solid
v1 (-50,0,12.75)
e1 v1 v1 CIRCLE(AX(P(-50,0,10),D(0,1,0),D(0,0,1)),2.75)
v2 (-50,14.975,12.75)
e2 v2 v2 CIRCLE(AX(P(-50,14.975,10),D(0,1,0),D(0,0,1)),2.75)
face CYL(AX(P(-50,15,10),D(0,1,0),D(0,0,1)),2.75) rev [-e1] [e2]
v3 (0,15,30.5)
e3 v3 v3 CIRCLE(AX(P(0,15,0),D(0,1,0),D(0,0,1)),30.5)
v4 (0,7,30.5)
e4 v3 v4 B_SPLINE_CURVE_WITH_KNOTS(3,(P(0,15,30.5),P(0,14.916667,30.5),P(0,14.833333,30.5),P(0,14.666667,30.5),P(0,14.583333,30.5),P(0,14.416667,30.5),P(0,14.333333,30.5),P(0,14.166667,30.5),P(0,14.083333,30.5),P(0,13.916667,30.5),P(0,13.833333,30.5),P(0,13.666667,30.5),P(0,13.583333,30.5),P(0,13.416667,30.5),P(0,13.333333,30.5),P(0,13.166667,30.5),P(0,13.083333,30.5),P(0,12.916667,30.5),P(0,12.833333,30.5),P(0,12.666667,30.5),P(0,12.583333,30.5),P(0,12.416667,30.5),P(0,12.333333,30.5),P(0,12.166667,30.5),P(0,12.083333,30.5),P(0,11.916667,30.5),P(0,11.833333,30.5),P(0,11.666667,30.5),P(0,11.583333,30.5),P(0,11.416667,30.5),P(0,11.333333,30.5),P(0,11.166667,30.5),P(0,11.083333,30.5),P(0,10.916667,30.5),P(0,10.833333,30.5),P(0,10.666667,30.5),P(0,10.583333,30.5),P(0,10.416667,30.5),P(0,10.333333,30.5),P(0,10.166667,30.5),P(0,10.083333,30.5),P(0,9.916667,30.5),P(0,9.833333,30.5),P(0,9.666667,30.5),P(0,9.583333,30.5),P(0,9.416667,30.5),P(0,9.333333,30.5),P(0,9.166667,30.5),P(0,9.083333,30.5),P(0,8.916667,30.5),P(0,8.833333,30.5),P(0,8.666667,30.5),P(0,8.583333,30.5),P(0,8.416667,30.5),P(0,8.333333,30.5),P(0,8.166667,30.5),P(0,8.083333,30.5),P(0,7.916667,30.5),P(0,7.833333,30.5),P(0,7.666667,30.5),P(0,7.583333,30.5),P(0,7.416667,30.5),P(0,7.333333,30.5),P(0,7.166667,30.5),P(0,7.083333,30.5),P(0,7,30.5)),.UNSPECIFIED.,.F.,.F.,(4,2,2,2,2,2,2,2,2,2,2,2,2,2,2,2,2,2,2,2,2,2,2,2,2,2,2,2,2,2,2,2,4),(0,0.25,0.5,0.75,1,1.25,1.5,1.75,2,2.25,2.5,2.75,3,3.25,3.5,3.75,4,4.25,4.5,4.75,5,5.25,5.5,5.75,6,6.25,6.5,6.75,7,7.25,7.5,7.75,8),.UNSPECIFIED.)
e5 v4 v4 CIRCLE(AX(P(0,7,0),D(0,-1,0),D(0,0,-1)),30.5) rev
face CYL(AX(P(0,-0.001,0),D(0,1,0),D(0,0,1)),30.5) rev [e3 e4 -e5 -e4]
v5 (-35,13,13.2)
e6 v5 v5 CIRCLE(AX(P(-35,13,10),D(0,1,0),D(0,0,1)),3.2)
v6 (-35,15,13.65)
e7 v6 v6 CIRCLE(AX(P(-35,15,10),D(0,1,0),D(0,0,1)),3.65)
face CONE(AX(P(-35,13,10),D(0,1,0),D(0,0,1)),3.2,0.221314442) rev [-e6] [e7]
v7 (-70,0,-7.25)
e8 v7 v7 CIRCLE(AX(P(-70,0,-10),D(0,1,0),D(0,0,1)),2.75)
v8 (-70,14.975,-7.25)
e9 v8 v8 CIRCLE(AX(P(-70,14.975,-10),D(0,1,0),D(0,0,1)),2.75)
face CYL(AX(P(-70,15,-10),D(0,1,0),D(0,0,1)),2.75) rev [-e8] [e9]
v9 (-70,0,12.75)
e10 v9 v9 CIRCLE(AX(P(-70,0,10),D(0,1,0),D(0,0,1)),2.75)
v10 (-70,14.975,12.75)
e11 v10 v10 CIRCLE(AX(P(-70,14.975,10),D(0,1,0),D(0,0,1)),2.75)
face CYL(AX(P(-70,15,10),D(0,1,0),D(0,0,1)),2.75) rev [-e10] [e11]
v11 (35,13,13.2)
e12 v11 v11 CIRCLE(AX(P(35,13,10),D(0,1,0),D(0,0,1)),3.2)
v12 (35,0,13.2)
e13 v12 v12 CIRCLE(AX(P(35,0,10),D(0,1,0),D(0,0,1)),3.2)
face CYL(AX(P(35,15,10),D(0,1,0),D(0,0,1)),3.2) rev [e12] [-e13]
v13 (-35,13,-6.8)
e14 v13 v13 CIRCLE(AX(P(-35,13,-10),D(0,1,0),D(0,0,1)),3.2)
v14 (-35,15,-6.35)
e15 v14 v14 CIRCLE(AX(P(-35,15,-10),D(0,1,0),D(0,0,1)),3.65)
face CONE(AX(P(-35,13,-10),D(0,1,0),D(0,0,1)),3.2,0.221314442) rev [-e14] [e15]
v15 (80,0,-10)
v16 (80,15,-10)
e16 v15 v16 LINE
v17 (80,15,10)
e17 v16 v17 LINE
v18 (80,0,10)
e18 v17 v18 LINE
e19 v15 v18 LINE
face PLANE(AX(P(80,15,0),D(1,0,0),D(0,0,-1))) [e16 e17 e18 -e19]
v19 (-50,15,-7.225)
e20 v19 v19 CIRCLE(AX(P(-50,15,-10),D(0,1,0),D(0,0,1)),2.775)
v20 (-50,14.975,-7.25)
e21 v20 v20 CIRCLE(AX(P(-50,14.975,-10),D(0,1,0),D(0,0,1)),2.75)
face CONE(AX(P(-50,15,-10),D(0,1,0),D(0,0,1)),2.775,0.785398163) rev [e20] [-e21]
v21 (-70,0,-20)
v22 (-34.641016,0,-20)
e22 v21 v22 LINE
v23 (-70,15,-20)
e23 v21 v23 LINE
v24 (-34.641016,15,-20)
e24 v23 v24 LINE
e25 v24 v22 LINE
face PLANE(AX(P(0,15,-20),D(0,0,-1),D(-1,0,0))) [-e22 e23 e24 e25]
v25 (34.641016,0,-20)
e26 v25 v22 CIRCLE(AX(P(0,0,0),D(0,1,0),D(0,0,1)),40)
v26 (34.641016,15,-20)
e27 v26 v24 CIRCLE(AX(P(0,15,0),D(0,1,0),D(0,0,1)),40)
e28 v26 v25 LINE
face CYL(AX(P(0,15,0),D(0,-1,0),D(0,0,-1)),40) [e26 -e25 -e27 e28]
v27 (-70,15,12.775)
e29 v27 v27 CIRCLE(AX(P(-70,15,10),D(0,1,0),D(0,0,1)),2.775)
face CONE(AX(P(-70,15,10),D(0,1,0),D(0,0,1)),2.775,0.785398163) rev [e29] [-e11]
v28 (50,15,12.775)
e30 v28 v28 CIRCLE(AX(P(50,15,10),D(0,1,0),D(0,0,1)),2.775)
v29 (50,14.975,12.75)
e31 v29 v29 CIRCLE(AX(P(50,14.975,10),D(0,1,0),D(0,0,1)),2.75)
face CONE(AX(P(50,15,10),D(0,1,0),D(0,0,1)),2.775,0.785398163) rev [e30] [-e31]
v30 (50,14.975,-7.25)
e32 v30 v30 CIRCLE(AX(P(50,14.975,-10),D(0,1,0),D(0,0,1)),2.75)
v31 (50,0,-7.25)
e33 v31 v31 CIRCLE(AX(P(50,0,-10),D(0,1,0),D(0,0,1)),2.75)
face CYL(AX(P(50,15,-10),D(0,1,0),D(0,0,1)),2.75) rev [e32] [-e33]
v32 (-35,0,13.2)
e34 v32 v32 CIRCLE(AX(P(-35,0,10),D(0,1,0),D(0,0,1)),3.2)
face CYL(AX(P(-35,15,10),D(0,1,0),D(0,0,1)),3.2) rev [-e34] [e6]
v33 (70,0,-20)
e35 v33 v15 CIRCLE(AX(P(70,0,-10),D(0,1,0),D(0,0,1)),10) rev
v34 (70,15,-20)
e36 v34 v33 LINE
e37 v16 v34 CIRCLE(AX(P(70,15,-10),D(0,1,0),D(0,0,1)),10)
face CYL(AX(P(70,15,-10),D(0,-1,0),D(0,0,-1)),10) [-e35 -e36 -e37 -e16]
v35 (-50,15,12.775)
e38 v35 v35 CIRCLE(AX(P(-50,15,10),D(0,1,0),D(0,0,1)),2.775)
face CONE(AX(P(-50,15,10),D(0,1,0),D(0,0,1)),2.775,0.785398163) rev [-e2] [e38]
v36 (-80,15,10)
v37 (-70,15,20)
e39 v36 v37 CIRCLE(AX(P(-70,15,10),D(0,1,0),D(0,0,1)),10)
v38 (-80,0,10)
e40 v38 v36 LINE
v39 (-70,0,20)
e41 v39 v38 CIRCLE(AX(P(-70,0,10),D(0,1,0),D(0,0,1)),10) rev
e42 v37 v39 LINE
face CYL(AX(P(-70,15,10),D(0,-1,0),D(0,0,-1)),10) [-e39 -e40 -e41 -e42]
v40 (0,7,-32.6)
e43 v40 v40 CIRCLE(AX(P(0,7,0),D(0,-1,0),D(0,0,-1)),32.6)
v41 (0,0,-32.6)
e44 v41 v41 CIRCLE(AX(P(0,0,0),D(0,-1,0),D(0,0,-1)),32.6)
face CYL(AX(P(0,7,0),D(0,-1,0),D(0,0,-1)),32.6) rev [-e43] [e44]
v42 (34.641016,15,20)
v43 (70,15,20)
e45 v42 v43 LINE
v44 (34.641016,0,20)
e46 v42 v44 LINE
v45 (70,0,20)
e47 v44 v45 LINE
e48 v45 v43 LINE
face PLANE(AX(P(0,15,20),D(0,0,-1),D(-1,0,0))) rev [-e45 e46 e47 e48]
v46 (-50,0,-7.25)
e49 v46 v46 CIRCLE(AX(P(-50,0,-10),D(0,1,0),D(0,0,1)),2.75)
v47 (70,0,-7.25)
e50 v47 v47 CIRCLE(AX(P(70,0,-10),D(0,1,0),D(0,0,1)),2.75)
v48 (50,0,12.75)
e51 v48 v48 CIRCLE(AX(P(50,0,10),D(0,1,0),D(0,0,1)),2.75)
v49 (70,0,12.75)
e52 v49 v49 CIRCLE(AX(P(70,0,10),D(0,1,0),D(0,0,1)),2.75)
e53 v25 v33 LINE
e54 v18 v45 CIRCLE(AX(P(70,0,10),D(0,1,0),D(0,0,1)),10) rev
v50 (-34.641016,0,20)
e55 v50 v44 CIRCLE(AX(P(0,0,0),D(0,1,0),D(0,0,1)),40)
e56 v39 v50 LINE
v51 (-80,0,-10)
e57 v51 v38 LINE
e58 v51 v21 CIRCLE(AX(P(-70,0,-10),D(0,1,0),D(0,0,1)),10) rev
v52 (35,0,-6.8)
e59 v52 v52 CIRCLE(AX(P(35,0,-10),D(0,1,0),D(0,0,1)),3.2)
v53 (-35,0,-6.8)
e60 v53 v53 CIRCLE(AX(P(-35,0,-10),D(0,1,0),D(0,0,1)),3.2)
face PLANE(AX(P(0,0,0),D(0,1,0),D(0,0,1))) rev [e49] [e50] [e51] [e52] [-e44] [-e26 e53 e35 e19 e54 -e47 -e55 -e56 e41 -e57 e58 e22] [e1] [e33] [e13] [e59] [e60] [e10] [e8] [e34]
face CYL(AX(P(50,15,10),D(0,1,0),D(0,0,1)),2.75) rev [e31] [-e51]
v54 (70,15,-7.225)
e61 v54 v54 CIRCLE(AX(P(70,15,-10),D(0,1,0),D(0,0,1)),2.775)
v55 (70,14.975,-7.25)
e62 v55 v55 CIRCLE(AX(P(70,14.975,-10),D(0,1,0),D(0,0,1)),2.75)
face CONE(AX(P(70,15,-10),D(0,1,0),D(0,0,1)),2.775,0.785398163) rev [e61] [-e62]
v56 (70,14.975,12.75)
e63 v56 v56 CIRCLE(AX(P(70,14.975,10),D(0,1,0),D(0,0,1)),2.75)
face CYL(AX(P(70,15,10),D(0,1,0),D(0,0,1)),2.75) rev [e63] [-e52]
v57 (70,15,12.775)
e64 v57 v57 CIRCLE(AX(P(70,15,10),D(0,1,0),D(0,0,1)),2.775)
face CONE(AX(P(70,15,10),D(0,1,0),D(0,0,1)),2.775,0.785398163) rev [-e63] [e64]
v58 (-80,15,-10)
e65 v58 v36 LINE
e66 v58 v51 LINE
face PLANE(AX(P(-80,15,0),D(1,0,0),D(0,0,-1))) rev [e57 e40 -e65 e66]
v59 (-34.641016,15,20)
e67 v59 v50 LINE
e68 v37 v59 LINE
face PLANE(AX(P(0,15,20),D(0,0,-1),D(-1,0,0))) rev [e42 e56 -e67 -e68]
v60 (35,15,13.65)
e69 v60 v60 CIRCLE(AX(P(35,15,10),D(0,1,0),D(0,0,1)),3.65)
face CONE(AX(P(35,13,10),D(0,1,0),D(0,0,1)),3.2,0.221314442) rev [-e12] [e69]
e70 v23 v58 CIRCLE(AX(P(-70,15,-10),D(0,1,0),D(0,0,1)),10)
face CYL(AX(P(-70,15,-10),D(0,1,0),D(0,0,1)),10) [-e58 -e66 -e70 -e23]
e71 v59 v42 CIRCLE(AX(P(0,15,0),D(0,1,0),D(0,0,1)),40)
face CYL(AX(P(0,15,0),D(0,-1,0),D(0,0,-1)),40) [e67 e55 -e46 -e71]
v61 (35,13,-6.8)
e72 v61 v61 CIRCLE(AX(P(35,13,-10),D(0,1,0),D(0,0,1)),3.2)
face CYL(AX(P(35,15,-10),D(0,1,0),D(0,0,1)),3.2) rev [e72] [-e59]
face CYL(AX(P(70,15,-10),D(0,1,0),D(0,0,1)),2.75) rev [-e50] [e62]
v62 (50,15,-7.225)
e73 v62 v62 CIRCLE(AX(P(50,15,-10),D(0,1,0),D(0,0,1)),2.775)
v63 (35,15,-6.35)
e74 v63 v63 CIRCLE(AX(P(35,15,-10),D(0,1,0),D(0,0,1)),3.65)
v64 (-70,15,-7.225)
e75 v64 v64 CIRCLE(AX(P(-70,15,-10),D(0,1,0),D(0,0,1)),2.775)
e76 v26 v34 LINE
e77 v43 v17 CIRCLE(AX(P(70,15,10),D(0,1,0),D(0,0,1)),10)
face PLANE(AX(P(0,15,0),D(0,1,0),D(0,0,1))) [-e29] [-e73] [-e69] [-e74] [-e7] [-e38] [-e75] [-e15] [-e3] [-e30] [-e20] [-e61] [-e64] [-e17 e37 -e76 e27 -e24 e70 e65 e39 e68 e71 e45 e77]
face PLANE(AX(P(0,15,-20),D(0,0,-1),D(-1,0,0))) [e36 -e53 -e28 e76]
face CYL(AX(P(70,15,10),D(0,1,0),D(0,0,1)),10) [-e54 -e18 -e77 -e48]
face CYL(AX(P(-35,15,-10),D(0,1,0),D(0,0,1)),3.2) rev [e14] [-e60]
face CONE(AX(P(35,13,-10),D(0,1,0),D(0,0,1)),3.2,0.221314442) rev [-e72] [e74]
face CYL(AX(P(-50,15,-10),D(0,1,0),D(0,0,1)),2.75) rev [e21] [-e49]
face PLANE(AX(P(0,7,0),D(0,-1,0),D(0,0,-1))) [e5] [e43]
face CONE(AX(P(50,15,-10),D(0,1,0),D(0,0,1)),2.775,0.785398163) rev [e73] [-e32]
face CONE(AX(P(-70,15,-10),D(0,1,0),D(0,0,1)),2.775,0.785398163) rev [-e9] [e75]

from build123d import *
from OCP.BRepFilletAPI import BRepFilletAPI_MakeChamfer

# Parameters (mm, degrees)
BOSS_EXTRUDE1_DEPTH = 15
CUT_EXTRUDE3_REACH  = 92.692
SKETCH4_R           = 30.5
SKETCH3_R           = 32.6
CUT_EXTRUDE4_DEPTH  = 7
FILLET1_R           = 10
HOLE1_D             = 6.4
HOLE1_CBORE_D       = 7.3
HOLE1_CBORE_DEPTH   = 2
CHAMFER1_SIZE       = 0.45
CHAMFER1_SIZE_2     = 2


# Read off the part's stored shape, not the designer's step: M5 Clearance Hole1
with BuildPart() as part:
    # Sketch1 → Boss-Extrude1 (new body)
    with BuildSketch(Plane(origin=(0, 0, 0), x_dir=(1, 0, 0), z_dir=(0, 1, 0))):
        with BuildLine():
            ThreePointArc((34.641016151, 20), (0, 40), (-34.641016151, 20))
            Line((-34.641016151, 20), (34.641016151, 20))
        make_face()
        with BuildLine():
            Line((34.641016151, 20), (-34.641016151, 20))
            ThreePointArc((-34.641016151, 20), (-40, 0), (-34.641016151, -20))
            Line((-34.641016151, -20), (34.641016151, -20))
            ThreePointArc((34.641016151, -20), (38.637033052, -10.352761804), (40, 0))
            ThreePointArc((40, 0), (38.637033052, 10.352761804), (34.641016151, 20))
        make_face()
        with BuildLine():
            Line((-34.641016151, 20), (-80, 20))
            Line((-80, 20), (-80, -20))
            Line((-80, -20), (-34.641016151, -20))
            ThreePointArc((-34.641016151, -20), (-40, 0), (-34.641016151, 20))
        make_face()
        with BuildLine():
            Line((80, 20), (34.641016151, 20))
            ThreePointArc((34.641016151, 20), (38.637033052, 10.352761804), (40, 0))
            ThreePointArc((40, 0), (38.637033052, -10.352761804), (34.641016151, -20))
            Line((34.641016151, -20), (80, -20))
            Line((80, -20), (80, 20))
        make_face()
        with BuildLine():
            Line((34.641016151, -20), (-34.641016151, -20))
            ThreePointArc((-34.641016151, -20), (0, -40), (34.641016151, -20))
        make_face()
    extrude(amount=BOSS_EXTRUDE1_DEPTH)

    # Sketch4 → Cut-Extrude3 (cut, up to next)
    with BuildSketch(Plane(origin=(0, 15, 0), x_dir=(1, 0, 0), z_dir=(0, 1, 0)), mode=Mode.PRIVATE) as cut_extrude3_sk1:
        with Locations(Location((0, 0, 0), (0, 0, 270))):
            Circle(SKETCH4_R)
    cut_extrude3_tool1 = extrude(cut_extrude3_sk1.sketch, amount=-CUT_EXTRUDE3_REACH, mode=Mode.PRIVATE) & part.part
    add(cut_extrude3_tool1.solids().sort_by_distance((0, 15, 0))[0], mode=Mode.SUBTRACT)

    # Sketch3 → Cut-Extrude4 (cut)
    with BuildSketch(Plane.XZ):
        with Locations(Location((0, 0, 0), (0, 0, 270))):
            Circle(SKETCH3_R)
    extrude(amount=-CUT_EXTRUDE4_DEPTH, mode=Mode.SUBTRACT)

    # M5 Clearance Hole1 outline → M5 Clearance Hole1 (revolve, cut)
    with BuildSketch(Plane(origin=(70, 0, -10), x_dir=(1, 0, 0), z_dir=(0, 0, 1))):
        Polygon((0, 0), (2.75, 0), (2.75, 14.975), (2.775, 15), (0, 15), align=None)
    revolve(axis=Axis((70, 0, -10), (0, 1, 0)), mode=Mode.SUBTRACT)

    # M5 Clearance Hole1 2 outline → M5 Clearance Hole1 2 (revolve, cut)
    with BuildSketch(Plane(origin=(50, 0, 10), x_dir=(1, 0, 0), z_dir=(0, 0, 1))):
        Polygon((0, 0), (2.75, 0), (2.75, 14.975), (2.775, 15), (0, 15), align=None)
    revolve(axis=Axis((50, 0, 10), (0, 1, 0)), mode=Mode.SUBTRACT)

    # M5 Clearance Hole1 3 outline → M5 Clearance Hole1 3 (revolve, cut)
    with BuildSketch(Plane(origin=(70, 0, 10), x_dir=(1, 0, 0), z_dir=(0, 0, 1))):
        Polygon((0, 0), (2.75, 0), (2.75, 14.975), (2.775, 15), (0, 15), align=None)
    revolve(axis=Axis((70, 0, 10), (0, 1, 0)), mode=Mode.SUBTRACT)

    # M5 Clearance Hole1 4 outline → M5 Clearance Hole1 4 (revolve, cut)
    with BuildSketch(Plane(origin=(50, 0, -10), x_dir=(1, 0, 0), z_dir=(0, 0, 1))):
        Polygon((0, 0), (2.75, 0), (2.75, 14.975), (2.775, 15), (0, 15), align=None)
    revolve(axis=Axis((50, 0, -10), (0, 1, 0)), mode=Mode.SUBTRACT)

    # M5 Clearance Hole1 5 outline → M5 Clearance Hole1 5 (revolve, cut)
    with BuildSketch(Plane(origin=(-50, 0, -10), x_dir=(1, 0, 0), z_dir=(0, 0, 1))):
        Polygon((0, 0), (2.75, 0), (2.75, 14.975), (2.775, 15), (0, 15), align=None)
    revolve(axis=Axis((-50, 0, -10), (0, 1, 0)), mode=Mode.SUBTRACT)

    # M5 Clearance Hole1 6 outline → M5 Clearance Hole1 6 (revolve, cut)
    with BuildSketch(Plane(origin=(-70, 0, 10), x_dir=(1, 0, 0), z_dir=(0, 0, 1))):
        Polygon((0, 0), (2.75, 0), (2.75, 14.975), (2.775, 15), (0, 15), align=None)
    revolve(axis=Axis((-70, 0, 10), (0, 1, 0)), mode=Mode.SUBTRACT)

    # M5 Clearance Hole1 7 outline → M5 Clearance Hole1 7 (revolve, cut)
    with BuildSketch(Plane(origin=(-50, 0, 10), x_dir=(1, 0, 0), z_dir=(0, 0, 1))):
        Polygon((0, 0), (2.75, 0), (2.75, 14.975), (2.775, 15), (0, 15), align=None)
    revolve(axis=Axis((-50, 0, 10), (0, 1, 0)), mode=Mode.SUBTRACT)

    # M5 Clearance Hole1 8 outline → M5 Clearance Hole1 8 (revolve, cut)
    with BuildSketch(Plane(origin=(-70, 0, -10), x_dir=(1, 0, 0), z_dir=(0, 0, 1))):
        Polygon((0, 0), (2.75, 0), (2.75, 14.975), (2.775, 15), (0, 15), align=None)
    revolve(axis=Axis((-70, 0, -10), (0, 1, 0)), mode=Mode.SUBTRACT)

    # Fillet1
    fillet1_edges = [part.edges().sort_by_distance(p)[0] for p in [
        (80, 7.5, -20),
        (80, 7.5, 20),
        (-80, 7.5, 20),
        (-80, 7.5, -20),
    ]]
    fillet(fillet1_edges, radius=FILLET1_R)

    # Hole1 (through all)
    with Locations(Plane(origin=(0, 15, 0), x_dir=(1, 0, 0), z_dir=(0, 1, 0))):
        with Locations((35, -10), (-35, 10), (-35, -10), (35, 10)):
            CounterBoreHole(HOLE1_D / 2, HOLE1_CBORE_D / 2, HOLE1_CBORE_DEPTH)

    # Chamfer1
    chamfer1_edges_1 = [part.edges().sort_by_distance(p)[0] for p in [
        (31.35, 13, 10),
    ]]
    chamfer1_side_1 = [part.faces().sort_by_distance(p)[0] for p in [
        (31.359, 13, 10),
    ]]
    chamfer1_edges_2 = [part.edges().sort_by_distance(p)[0] for p in [
        (31.35, 13, -10),
    ]]
    chamfer1_side_2 = [part.faces().sort_by_distance(p)[0] for p in [
        (31.359, 13, -10),
    ]]
    chamfer1_edges_3 = [part.edges().sort_by_distance(p)[0] for p in [
        (-38.65, 13, 10),
    ]]
    chamfer1_side_3 = [part.faces().sort_by_distance(p)[0] for p in [
        (-38.641, 13, 10),
    ]]
    chamfer1_edges_4 = [part.edges().sort_by_distance(p)[0] for p in [
        (-38.65, 13, -10),
    ]]
    chamfer1_side_4 = [part.faces().sort_by_distance(p)[0] for p in [
        (-38.641, 13, -10),
    ]]
    chamfer1 = BRepFilletAPI_MakeChamfer(part.part.solid().wrapped)
    for e in chamfer1_edges_1:
        chamfer1.Add(CHAMFER1_SIZE - 0.0001, CHAMFER1_SIZE_2 - 0.0001, e.wrapped, chamfer1_side_1[0].wrapped)
    for e in chamfer1_edges_2:
        chamfer1.Add(CHAMFER1_SIZE - 0.0001, CHAMFER1_SIZE_2 - 0.0001, e.wrapped, chamfer1_side_2[0].wrapped)
    for e in chamfer1_edges_3:
        chamfer1.Add(CHAMFER1_SIZE - 0.0001, CHAMFER1_SIZE_2 - 0.0001, e.wrapped, chamfer1_side_3[0].wrapped)
    for e in chamfer1_edges_4:
        chamfer1.Add(CHAMFER1_SIZE - 0.0001, CHAMFER1_SIZE_2 - 0.0001, e.wrapped, chamfer1_side_4[0].wrapped)
    add(Compound.cast(chamfer1.Shape()), mode=Mode.REPLACE)  # a hair under: the kernel refuses the full size


solid = part.part
